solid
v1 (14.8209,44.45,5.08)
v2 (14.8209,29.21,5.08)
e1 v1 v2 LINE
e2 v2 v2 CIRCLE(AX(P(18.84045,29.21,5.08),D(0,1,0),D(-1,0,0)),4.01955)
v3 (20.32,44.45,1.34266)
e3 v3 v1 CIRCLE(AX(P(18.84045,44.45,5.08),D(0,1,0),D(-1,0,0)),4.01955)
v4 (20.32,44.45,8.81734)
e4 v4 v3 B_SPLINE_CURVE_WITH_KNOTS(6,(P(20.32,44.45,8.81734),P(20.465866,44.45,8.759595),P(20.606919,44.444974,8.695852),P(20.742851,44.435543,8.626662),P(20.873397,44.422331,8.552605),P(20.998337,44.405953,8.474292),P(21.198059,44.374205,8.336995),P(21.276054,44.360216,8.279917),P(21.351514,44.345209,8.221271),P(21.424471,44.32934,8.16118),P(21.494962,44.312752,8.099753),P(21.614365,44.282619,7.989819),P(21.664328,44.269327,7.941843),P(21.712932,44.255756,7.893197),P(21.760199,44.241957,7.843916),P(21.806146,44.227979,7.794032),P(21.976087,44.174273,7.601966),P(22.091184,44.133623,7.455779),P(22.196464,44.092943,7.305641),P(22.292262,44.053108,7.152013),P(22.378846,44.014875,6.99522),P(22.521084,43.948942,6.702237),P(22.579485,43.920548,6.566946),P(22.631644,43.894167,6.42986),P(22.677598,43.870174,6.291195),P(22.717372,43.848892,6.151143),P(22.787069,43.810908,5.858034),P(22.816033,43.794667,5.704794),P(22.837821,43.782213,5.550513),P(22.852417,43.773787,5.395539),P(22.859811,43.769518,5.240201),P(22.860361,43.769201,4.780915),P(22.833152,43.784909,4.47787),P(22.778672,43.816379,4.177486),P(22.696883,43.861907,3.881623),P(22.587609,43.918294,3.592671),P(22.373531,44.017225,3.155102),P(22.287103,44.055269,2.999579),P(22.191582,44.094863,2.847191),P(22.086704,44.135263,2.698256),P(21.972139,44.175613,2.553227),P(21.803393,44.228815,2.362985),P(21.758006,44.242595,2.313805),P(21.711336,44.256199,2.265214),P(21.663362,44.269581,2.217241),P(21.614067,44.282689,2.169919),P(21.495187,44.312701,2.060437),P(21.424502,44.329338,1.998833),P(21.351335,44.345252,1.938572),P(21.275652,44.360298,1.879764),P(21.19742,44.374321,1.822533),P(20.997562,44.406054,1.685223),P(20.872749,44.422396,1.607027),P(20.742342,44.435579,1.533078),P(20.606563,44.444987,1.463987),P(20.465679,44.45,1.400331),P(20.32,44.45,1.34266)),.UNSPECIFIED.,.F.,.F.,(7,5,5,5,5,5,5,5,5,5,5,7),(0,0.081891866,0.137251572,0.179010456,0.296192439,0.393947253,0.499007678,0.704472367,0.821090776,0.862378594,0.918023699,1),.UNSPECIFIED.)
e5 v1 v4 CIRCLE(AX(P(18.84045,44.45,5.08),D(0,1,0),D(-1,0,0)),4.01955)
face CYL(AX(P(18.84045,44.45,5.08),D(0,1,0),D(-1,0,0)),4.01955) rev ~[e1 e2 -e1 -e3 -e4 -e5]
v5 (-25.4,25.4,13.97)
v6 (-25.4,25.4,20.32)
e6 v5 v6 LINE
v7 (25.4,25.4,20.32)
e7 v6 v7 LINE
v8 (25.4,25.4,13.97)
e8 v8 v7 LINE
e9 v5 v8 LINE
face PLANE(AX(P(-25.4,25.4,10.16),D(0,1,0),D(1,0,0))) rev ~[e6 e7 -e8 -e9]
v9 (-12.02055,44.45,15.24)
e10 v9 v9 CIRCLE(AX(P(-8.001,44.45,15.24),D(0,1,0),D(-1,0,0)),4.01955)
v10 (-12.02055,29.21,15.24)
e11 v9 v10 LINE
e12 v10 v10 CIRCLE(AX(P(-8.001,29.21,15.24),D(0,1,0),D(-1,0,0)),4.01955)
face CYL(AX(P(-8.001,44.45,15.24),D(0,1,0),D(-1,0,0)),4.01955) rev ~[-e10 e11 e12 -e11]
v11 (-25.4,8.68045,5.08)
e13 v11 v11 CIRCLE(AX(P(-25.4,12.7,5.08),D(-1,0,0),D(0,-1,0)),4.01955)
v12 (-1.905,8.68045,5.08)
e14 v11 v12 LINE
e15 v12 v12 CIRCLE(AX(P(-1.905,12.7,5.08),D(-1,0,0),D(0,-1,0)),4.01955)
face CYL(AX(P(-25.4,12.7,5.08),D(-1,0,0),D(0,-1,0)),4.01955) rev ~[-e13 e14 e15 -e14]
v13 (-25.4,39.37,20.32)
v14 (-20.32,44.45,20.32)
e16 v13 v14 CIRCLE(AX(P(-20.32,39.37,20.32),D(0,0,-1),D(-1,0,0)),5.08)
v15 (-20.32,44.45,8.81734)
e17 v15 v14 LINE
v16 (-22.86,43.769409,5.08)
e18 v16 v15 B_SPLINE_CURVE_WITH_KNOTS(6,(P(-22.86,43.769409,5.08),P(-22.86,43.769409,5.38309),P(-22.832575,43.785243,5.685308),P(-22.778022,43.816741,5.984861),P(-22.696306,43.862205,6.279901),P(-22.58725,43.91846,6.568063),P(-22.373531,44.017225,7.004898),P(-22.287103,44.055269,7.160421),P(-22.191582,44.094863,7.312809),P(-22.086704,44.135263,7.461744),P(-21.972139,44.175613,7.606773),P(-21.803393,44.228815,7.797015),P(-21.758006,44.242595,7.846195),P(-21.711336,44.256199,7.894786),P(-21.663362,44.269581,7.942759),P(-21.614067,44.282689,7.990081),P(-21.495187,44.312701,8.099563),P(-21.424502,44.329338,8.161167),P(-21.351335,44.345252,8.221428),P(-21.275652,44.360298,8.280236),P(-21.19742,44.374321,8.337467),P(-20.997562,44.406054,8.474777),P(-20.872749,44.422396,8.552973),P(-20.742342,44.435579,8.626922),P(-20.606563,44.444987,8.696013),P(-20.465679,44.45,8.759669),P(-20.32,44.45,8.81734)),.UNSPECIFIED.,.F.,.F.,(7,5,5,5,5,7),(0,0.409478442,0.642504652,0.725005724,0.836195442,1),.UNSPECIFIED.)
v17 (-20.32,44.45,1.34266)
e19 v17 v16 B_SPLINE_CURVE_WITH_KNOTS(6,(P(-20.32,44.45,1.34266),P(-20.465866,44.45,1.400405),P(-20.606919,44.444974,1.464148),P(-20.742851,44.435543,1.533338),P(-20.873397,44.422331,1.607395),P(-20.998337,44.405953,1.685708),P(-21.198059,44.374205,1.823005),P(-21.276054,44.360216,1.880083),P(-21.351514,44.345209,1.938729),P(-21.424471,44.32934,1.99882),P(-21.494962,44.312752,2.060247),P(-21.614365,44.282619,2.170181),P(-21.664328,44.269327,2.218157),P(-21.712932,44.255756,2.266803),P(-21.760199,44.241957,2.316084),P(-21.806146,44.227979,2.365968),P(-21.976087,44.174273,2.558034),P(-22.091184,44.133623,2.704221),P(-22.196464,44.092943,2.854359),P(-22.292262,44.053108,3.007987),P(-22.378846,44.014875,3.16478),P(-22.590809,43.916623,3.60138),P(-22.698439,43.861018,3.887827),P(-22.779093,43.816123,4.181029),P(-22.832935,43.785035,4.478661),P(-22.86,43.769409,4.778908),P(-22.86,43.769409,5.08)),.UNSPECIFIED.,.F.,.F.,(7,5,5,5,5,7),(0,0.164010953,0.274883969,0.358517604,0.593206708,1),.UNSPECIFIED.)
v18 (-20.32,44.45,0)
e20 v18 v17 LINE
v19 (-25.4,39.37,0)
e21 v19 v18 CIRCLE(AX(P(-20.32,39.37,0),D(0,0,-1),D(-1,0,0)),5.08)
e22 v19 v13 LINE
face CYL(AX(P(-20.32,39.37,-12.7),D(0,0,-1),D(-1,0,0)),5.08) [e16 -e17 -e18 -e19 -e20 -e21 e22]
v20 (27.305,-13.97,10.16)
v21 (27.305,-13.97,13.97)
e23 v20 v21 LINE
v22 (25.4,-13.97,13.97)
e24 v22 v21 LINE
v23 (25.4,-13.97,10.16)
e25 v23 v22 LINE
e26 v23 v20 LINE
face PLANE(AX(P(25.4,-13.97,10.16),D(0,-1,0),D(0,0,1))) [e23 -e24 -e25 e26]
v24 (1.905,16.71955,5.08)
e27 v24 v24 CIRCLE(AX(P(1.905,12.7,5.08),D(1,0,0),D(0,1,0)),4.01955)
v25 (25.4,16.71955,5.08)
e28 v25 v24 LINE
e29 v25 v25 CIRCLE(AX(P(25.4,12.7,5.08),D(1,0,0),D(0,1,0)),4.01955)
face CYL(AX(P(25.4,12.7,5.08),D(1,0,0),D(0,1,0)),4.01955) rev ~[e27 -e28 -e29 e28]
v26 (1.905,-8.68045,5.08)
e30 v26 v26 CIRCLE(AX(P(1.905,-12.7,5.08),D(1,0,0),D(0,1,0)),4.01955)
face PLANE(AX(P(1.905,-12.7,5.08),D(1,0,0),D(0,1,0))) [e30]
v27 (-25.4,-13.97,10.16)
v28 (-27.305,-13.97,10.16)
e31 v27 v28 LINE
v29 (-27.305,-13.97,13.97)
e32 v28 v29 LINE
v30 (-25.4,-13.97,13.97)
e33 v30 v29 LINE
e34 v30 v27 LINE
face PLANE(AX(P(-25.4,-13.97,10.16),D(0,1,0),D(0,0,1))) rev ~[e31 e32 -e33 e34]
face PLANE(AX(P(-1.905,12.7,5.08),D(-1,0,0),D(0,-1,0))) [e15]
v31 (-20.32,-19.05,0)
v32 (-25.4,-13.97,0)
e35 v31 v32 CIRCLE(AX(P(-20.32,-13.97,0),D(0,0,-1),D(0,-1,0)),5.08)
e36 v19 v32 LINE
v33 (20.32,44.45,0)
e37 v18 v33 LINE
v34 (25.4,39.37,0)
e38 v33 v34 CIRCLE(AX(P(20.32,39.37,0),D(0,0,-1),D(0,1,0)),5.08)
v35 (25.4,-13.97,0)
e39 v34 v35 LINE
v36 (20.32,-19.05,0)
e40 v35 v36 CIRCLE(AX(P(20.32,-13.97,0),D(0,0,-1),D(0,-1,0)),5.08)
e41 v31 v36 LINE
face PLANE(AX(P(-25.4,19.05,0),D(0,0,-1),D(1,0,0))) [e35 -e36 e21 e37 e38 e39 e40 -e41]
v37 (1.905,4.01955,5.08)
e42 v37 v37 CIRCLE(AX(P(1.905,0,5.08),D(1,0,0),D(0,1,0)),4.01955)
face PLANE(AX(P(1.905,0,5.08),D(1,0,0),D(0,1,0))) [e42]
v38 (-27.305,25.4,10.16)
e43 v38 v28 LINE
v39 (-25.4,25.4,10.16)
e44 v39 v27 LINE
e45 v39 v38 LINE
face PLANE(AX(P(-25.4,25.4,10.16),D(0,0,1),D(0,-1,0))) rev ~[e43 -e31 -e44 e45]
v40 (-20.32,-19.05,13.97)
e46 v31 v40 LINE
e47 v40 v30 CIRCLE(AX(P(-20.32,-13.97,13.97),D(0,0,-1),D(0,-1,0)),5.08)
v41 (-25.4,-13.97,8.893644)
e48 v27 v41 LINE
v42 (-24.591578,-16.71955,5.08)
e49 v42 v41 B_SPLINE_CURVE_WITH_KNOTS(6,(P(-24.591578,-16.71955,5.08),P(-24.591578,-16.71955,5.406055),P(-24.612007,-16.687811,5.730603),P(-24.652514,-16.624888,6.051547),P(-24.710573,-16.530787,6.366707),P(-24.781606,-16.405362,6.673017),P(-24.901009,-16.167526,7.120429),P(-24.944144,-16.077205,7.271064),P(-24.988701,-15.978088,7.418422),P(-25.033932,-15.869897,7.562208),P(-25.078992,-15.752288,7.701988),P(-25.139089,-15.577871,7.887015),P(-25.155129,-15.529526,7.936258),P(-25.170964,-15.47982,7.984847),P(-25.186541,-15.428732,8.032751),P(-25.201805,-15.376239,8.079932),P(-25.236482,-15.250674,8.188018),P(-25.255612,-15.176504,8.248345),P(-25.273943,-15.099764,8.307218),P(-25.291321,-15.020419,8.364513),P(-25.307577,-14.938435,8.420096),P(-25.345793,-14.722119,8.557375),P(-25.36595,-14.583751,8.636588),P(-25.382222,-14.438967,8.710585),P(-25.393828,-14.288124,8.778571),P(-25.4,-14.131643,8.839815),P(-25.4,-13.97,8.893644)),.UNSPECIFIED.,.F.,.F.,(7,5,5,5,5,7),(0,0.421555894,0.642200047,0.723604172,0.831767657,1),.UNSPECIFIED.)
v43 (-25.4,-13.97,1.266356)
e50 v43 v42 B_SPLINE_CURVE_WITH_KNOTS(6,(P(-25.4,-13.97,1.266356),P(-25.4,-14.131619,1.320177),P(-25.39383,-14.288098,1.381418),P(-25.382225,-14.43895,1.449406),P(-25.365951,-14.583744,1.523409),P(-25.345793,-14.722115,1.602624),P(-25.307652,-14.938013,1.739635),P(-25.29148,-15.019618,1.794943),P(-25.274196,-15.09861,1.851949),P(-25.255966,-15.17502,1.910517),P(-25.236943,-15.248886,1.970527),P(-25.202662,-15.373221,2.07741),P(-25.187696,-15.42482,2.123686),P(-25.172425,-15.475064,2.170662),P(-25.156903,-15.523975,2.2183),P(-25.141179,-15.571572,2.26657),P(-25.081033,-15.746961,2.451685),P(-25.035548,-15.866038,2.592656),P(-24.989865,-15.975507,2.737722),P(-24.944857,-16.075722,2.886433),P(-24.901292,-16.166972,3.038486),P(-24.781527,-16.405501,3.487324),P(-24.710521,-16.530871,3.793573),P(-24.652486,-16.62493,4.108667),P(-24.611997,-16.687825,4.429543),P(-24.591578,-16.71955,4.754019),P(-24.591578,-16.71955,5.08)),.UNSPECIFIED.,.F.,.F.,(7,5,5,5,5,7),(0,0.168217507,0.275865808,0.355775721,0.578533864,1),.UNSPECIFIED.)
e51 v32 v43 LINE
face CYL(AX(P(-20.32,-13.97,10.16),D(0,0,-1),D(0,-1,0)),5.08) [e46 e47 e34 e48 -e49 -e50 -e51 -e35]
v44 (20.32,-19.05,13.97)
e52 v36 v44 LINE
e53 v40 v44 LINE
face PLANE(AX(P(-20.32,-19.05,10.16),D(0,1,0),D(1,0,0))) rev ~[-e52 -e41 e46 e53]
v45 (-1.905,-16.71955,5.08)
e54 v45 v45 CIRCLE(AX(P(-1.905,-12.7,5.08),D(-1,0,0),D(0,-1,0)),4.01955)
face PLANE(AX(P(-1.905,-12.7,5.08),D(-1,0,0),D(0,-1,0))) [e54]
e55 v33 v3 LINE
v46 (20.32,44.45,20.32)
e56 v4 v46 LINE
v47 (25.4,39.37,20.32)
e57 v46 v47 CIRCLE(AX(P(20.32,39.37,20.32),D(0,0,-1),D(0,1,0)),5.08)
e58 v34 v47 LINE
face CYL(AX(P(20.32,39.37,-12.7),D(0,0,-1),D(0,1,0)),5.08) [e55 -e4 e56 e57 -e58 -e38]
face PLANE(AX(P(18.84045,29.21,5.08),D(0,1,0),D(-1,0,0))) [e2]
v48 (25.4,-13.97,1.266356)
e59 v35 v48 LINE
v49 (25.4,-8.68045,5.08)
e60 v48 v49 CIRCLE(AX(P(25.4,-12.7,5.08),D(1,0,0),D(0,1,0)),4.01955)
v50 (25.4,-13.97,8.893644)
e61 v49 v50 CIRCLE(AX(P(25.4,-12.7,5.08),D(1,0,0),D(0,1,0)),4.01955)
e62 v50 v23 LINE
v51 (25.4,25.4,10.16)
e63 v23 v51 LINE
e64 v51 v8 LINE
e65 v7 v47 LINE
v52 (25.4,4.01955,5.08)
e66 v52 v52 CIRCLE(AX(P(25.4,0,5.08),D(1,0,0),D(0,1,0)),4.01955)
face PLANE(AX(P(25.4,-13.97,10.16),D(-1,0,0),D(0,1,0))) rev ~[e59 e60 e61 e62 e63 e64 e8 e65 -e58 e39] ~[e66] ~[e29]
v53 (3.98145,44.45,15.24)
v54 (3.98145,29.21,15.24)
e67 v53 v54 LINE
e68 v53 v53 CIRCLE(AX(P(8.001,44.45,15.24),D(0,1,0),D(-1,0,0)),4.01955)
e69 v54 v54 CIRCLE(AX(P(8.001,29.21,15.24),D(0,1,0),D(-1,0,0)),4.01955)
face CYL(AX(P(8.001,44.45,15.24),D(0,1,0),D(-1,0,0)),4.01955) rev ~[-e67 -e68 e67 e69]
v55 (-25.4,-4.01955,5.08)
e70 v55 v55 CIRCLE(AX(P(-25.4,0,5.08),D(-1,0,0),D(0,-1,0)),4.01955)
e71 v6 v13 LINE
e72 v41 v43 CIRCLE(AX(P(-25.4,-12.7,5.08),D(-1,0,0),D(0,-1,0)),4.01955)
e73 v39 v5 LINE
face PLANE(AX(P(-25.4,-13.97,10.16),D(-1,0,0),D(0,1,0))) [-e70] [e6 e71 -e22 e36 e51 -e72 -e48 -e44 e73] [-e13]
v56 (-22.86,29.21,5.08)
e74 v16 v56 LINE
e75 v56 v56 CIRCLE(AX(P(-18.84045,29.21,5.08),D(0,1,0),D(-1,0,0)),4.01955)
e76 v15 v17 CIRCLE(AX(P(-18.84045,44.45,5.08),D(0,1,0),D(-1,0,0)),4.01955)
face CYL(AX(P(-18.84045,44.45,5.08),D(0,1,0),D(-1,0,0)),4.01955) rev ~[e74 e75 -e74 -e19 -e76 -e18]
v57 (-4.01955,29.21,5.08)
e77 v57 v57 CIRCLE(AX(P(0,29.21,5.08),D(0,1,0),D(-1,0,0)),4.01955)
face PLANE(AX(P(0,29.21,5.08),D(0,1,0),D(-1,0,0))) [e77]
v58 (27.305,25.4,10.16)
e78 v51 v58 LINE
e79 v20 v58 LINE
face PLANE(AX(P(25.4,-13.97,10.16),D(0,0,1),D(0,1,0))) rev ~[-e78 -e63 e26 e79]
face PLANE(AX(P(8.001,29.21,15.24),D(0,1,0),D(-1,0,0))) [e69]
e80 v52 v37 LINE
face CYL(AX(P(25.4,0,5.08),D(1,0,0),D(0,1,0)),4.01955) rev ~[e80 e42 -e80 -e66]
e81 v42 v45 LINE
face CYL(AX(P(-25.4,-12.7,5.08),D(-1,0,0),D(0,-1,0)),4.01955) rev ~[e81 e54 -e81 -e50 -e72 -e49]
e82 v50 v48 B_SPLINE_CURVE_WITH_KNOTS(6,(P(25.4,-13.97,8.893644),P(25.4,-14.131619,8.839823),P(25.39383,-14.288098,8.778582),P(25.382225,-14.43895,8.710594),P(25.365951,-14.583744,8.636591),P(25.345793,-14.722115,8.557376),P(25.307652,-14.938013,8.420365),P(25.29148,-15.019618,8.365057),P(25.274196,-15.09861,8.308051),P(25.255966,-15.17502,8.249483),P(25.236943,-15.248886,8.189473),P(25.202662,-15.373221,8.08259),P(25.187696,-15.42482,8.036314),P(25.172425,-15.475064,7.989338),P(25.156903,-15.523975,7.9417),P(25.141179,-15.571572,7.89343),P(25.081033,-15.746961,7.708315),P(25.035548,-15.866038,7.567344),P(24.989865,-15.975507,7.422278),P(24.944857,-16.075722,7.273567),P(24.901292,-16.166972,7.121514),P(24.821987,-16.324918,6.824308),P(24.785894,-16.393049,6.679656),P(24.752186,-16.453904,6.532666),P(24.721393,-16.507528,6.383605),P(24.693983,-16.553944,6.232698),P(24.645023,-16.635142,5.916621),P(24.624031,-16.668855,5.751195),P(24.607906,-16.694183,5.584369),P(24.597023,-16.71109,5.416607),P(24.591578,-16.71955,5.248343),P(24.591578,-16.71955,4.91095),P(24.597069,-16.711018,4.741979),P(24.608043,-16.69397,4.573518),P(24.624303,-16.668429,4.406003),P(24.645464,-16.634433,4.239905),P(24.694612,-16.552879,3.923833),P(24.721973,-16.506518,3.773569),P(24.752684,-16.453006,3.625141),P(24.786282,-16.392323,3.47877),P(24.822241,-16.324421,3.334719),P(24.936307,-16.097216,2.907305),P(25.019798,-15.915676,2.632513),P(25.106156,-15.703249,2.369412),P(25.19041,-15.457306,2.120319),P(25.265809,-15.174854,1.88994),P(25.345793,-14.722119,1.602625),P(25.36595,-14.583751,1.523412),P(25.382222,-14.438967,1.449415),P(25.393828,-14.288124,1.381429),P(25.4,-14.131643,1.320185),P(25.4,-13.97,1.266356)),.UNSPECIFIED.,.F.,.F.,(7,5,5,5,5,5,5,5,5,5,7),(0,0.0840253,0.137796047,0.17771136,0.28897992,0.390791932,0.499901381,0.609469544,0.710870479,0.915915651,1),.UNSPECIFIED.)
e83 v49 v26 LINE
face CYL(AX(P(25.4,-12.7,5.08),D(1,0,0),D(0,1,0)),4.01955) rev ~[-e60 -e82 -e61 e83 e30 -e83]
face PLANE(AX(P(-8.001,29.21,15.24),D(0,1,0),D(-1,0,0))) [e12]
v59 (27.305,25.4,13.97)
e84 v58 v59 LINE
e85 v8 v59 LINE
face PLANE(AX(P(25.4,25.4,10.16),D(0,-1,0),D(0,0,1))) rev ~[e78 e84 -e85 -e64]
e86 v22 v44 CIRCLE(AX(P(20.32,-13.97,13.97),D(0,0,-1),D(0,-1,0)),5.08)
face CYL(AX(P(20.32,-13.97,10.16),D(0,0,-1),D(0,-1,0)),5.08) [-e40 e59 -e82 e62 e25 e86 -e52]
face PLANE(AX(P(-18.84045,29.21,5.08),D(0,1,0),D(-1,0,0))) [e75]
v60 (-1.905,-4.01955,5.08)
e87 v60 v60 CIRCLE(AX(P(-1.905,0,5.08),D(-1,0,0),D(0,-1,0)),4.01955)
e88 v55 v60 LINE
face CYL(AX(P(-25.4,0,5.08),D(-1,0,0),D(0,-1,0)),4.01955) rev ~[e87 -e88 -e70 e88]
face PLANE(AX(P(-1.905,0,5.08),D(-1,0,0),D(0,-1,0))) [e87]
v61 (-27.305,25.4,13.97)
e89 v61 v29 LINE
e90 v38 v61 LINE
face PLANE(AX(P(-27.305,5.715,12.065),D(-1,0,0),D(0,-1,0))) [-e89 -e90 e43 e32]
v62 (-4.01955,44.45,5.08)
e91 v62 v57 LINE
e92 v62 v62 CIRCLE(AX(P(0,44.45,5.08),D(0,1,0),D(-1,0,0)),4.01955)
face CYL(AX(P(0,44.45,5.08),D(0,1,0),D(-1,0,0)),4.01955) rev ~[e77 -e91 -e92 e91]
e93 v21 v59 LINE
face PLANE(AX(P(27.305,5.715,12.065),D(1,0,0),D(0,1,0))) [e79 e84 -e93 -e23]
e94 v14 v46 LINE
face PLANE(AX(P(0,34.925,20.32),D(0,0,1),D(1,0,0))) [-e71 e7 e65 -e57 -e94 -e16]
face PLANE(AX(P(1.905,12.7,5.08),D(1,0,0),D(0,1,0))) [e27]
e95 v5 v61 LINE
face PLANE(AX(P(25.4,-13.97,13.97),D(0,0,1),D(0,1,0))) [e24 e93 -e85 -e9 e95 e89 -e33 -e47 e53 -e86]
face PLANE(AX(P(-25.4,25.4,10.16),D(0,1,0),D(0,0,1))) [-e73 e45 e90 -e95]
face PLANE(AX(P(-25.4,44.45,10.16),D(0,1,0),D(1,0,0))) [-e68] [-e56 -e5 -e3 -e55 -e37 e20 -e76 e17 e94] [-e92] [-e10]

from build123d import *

# Parameters (mm, degrees)
F0_W         = 50.8
F0_H         = 38.1
F1_DEPTH     = 10.16
F2_R         = 4.01955
F3_DEPTH     = 23.495
F4_R         = 4.01955
F5_DEPTH     = 23.495
F6_DEPTH     = 25.4
F7_W         = 50.8
F7_H         = 19.05
F8_DEPTH     = 10.16
F9_R         = 4.01955
F10_DEPTH    = 15.24
F11_T1_DEPTH = 35.56
F12_T1_DEPTH = 45.72
F13_DEPTH    = 3.81
F15_W        = 39.37
F15_H        = 3.81
F16_DEPTH    = 1.905
F14_W        = 39.37
F14_H        = 3.81
F17_DEPTH    = 1.905


# Not quite as in the source:
# - a fillet or chamfer that OpenCascade refuses, or shapes differently, is made with other operations: its cross-section is extruded or revolved along the edge and cut away or added


with BuildPart() as f1:
    # F0 (on Top) → F1 (new body)
    with BuildSketch(Plane.XY):
        Rectangle(F0_W, F0_H)
    extrude(amount=F1_DEPTH)

    # F2 (on face) → F3 (cut)
    with BuildSketch(Plane(origin=(-25.4, 0, 0), x_dir=(0, -1, 0), z_dir=(-1, 0, 0))):
        with Locations((-12.7, 5.08)):
            Circle(F2_R)
        with Locations((0, 5.08)):
            Circle(F2_R)
        with Locations((12.7, 5.08)):
            Circle(F2_R)
    extrude(amount=-F3_DEPTH, mode=Mode.SUBTRACT)

    # F4 (on face) → F5 (cut)
    with BuildSketch(Plane.YZ.offset(25.4)):
        with Locations((-12.7, 5.08)):
            Circle(F4_R)
        with Locations((0, 5.08)):
            Circle(F4_R)
        with Locations((12.7, 5.08)):
            Circle(F4_R)
    extrude(amount=-F5_DEPTH, mode=Mode.SUBTRACT)

    # F6 (add): a face of the model
    f6_faces = [f1.faces().sort_by_distance(p)[0] for p in [
        (0, 19.05, 5.08),
    ]]
    extrude(f6_faces, amount=F6_DEPTH)

    # F7 (on face) → F8 (join)
    with BuildSketch(Plane.XY.offset(10.16)):
        with Locations((0, 34.925)):
            Rectangle(F7_W, F7_H)
    extrude(amount=F8_DEPTH)

    # F9 (on face) → F10 (cut)
    with BuildSketch(Plane(origin=(0, 44.45, 0), x_dir=(-1, 0, 0), z_dir=(0, 1, 0))):
        with Locations((0, 5.08)):
            Circle(F9_R)
        with Locations((-8.001, 15.24)):
            Circle(F9_R)
        with Locations((-18.84045, 5.08)):
            Circle(F9_R)
        with Locations((8.001, 15.24)):
            Circle(F9_R)
        with Locations((18.84045, 5.08)):
            Circle(F9_R)
    extrude(amount=-F10_DEPTH, mode=Mode.SUBTRACT)

    # F11: fillet of radius 5.08 on 2 edges, made by hand

    # F11_s2 → F11_t1 (cut)
    with BuildSketch(Plane.XY.offset(-12.7)):
        with BuildLine():
            ThreePointArc((-20.32, -19.05), (-23.9121024484, -17.5621024484), (-25.4, -13.97))
            Line((-25.4, -13.97), (-25.4, -19.05))
            Line((-25.4, -19.05), (-20.32, -19.05))
        make_face()
        with BuildLine():
            ThreePointArc((20.32, -19.05), (23.9121024484, -17.5621024484), (25.4, -13.97))
            Line((25.4, -13.97), (25.4, -19.05))
            Line((25.4, -19.05), (20.32, -19.05))
        make_face()
    extrude(amount=F11_T1_DEPTH, mode=Mode.SUBTRACT)

    # F12: fillet of radius 5.08 on 2 edges, made by hand

    # F12_s2 → F12_t1 (cut)
    with BuildSketch(Plane.XY.offset(-12.7)):
        with BuildLine():
            ThreePointArc((-25.4, 39.37), (-23.9121024484, 42.9621024484), (-20.32, 44.45))
            Line((-20.32, 44.45), (-25.4, 44.45))
            Line((-25.4, 44.45), (-25.4, 39.37))
        make_face()
        with BuildLine():
            ThreePointArc((20.32, 44.45), (23.9121024484, 42.9621024484), (25.4, 39.37))
            Line((25.4, 39.37), (25.4, 44.45))
            Line((25.4, 44.45), (20.32, 44.45))
        make_face()
    extrude(amount=F12_T1_DEPTH, mode=Mode.SUBTRACT)

    # F13 (add): a face of the model
    f13_faces = [f1.faces().sort_by_distance(p)[0] for p in [
        (0, 3.2789617265, 10.16),
    ]]
    extrude(f13_faces, amount=F13_DEPTH)

    # F15 (on face) → F16 (join)
    with BuildSketch(Plane(origin=(-25.4, 0, 0), x_dir=(0, -1, 0), z_dir=(-1, 0, 0))):
        with Locations((-5.715, 12.065)):
            Rectangle(F15_W, F15_H)
    extrude(amount=F16_DEPTH)

    # F14 (on face) → F17 (join)
    with BuildSketch(Plane.YZ.offset(25.4)):
        with Locations((5.715, 12.065)):
            Rectangle(F14_W, F14_H)
    extrude(amount=F17_DEPTH)


solid = f1.part
